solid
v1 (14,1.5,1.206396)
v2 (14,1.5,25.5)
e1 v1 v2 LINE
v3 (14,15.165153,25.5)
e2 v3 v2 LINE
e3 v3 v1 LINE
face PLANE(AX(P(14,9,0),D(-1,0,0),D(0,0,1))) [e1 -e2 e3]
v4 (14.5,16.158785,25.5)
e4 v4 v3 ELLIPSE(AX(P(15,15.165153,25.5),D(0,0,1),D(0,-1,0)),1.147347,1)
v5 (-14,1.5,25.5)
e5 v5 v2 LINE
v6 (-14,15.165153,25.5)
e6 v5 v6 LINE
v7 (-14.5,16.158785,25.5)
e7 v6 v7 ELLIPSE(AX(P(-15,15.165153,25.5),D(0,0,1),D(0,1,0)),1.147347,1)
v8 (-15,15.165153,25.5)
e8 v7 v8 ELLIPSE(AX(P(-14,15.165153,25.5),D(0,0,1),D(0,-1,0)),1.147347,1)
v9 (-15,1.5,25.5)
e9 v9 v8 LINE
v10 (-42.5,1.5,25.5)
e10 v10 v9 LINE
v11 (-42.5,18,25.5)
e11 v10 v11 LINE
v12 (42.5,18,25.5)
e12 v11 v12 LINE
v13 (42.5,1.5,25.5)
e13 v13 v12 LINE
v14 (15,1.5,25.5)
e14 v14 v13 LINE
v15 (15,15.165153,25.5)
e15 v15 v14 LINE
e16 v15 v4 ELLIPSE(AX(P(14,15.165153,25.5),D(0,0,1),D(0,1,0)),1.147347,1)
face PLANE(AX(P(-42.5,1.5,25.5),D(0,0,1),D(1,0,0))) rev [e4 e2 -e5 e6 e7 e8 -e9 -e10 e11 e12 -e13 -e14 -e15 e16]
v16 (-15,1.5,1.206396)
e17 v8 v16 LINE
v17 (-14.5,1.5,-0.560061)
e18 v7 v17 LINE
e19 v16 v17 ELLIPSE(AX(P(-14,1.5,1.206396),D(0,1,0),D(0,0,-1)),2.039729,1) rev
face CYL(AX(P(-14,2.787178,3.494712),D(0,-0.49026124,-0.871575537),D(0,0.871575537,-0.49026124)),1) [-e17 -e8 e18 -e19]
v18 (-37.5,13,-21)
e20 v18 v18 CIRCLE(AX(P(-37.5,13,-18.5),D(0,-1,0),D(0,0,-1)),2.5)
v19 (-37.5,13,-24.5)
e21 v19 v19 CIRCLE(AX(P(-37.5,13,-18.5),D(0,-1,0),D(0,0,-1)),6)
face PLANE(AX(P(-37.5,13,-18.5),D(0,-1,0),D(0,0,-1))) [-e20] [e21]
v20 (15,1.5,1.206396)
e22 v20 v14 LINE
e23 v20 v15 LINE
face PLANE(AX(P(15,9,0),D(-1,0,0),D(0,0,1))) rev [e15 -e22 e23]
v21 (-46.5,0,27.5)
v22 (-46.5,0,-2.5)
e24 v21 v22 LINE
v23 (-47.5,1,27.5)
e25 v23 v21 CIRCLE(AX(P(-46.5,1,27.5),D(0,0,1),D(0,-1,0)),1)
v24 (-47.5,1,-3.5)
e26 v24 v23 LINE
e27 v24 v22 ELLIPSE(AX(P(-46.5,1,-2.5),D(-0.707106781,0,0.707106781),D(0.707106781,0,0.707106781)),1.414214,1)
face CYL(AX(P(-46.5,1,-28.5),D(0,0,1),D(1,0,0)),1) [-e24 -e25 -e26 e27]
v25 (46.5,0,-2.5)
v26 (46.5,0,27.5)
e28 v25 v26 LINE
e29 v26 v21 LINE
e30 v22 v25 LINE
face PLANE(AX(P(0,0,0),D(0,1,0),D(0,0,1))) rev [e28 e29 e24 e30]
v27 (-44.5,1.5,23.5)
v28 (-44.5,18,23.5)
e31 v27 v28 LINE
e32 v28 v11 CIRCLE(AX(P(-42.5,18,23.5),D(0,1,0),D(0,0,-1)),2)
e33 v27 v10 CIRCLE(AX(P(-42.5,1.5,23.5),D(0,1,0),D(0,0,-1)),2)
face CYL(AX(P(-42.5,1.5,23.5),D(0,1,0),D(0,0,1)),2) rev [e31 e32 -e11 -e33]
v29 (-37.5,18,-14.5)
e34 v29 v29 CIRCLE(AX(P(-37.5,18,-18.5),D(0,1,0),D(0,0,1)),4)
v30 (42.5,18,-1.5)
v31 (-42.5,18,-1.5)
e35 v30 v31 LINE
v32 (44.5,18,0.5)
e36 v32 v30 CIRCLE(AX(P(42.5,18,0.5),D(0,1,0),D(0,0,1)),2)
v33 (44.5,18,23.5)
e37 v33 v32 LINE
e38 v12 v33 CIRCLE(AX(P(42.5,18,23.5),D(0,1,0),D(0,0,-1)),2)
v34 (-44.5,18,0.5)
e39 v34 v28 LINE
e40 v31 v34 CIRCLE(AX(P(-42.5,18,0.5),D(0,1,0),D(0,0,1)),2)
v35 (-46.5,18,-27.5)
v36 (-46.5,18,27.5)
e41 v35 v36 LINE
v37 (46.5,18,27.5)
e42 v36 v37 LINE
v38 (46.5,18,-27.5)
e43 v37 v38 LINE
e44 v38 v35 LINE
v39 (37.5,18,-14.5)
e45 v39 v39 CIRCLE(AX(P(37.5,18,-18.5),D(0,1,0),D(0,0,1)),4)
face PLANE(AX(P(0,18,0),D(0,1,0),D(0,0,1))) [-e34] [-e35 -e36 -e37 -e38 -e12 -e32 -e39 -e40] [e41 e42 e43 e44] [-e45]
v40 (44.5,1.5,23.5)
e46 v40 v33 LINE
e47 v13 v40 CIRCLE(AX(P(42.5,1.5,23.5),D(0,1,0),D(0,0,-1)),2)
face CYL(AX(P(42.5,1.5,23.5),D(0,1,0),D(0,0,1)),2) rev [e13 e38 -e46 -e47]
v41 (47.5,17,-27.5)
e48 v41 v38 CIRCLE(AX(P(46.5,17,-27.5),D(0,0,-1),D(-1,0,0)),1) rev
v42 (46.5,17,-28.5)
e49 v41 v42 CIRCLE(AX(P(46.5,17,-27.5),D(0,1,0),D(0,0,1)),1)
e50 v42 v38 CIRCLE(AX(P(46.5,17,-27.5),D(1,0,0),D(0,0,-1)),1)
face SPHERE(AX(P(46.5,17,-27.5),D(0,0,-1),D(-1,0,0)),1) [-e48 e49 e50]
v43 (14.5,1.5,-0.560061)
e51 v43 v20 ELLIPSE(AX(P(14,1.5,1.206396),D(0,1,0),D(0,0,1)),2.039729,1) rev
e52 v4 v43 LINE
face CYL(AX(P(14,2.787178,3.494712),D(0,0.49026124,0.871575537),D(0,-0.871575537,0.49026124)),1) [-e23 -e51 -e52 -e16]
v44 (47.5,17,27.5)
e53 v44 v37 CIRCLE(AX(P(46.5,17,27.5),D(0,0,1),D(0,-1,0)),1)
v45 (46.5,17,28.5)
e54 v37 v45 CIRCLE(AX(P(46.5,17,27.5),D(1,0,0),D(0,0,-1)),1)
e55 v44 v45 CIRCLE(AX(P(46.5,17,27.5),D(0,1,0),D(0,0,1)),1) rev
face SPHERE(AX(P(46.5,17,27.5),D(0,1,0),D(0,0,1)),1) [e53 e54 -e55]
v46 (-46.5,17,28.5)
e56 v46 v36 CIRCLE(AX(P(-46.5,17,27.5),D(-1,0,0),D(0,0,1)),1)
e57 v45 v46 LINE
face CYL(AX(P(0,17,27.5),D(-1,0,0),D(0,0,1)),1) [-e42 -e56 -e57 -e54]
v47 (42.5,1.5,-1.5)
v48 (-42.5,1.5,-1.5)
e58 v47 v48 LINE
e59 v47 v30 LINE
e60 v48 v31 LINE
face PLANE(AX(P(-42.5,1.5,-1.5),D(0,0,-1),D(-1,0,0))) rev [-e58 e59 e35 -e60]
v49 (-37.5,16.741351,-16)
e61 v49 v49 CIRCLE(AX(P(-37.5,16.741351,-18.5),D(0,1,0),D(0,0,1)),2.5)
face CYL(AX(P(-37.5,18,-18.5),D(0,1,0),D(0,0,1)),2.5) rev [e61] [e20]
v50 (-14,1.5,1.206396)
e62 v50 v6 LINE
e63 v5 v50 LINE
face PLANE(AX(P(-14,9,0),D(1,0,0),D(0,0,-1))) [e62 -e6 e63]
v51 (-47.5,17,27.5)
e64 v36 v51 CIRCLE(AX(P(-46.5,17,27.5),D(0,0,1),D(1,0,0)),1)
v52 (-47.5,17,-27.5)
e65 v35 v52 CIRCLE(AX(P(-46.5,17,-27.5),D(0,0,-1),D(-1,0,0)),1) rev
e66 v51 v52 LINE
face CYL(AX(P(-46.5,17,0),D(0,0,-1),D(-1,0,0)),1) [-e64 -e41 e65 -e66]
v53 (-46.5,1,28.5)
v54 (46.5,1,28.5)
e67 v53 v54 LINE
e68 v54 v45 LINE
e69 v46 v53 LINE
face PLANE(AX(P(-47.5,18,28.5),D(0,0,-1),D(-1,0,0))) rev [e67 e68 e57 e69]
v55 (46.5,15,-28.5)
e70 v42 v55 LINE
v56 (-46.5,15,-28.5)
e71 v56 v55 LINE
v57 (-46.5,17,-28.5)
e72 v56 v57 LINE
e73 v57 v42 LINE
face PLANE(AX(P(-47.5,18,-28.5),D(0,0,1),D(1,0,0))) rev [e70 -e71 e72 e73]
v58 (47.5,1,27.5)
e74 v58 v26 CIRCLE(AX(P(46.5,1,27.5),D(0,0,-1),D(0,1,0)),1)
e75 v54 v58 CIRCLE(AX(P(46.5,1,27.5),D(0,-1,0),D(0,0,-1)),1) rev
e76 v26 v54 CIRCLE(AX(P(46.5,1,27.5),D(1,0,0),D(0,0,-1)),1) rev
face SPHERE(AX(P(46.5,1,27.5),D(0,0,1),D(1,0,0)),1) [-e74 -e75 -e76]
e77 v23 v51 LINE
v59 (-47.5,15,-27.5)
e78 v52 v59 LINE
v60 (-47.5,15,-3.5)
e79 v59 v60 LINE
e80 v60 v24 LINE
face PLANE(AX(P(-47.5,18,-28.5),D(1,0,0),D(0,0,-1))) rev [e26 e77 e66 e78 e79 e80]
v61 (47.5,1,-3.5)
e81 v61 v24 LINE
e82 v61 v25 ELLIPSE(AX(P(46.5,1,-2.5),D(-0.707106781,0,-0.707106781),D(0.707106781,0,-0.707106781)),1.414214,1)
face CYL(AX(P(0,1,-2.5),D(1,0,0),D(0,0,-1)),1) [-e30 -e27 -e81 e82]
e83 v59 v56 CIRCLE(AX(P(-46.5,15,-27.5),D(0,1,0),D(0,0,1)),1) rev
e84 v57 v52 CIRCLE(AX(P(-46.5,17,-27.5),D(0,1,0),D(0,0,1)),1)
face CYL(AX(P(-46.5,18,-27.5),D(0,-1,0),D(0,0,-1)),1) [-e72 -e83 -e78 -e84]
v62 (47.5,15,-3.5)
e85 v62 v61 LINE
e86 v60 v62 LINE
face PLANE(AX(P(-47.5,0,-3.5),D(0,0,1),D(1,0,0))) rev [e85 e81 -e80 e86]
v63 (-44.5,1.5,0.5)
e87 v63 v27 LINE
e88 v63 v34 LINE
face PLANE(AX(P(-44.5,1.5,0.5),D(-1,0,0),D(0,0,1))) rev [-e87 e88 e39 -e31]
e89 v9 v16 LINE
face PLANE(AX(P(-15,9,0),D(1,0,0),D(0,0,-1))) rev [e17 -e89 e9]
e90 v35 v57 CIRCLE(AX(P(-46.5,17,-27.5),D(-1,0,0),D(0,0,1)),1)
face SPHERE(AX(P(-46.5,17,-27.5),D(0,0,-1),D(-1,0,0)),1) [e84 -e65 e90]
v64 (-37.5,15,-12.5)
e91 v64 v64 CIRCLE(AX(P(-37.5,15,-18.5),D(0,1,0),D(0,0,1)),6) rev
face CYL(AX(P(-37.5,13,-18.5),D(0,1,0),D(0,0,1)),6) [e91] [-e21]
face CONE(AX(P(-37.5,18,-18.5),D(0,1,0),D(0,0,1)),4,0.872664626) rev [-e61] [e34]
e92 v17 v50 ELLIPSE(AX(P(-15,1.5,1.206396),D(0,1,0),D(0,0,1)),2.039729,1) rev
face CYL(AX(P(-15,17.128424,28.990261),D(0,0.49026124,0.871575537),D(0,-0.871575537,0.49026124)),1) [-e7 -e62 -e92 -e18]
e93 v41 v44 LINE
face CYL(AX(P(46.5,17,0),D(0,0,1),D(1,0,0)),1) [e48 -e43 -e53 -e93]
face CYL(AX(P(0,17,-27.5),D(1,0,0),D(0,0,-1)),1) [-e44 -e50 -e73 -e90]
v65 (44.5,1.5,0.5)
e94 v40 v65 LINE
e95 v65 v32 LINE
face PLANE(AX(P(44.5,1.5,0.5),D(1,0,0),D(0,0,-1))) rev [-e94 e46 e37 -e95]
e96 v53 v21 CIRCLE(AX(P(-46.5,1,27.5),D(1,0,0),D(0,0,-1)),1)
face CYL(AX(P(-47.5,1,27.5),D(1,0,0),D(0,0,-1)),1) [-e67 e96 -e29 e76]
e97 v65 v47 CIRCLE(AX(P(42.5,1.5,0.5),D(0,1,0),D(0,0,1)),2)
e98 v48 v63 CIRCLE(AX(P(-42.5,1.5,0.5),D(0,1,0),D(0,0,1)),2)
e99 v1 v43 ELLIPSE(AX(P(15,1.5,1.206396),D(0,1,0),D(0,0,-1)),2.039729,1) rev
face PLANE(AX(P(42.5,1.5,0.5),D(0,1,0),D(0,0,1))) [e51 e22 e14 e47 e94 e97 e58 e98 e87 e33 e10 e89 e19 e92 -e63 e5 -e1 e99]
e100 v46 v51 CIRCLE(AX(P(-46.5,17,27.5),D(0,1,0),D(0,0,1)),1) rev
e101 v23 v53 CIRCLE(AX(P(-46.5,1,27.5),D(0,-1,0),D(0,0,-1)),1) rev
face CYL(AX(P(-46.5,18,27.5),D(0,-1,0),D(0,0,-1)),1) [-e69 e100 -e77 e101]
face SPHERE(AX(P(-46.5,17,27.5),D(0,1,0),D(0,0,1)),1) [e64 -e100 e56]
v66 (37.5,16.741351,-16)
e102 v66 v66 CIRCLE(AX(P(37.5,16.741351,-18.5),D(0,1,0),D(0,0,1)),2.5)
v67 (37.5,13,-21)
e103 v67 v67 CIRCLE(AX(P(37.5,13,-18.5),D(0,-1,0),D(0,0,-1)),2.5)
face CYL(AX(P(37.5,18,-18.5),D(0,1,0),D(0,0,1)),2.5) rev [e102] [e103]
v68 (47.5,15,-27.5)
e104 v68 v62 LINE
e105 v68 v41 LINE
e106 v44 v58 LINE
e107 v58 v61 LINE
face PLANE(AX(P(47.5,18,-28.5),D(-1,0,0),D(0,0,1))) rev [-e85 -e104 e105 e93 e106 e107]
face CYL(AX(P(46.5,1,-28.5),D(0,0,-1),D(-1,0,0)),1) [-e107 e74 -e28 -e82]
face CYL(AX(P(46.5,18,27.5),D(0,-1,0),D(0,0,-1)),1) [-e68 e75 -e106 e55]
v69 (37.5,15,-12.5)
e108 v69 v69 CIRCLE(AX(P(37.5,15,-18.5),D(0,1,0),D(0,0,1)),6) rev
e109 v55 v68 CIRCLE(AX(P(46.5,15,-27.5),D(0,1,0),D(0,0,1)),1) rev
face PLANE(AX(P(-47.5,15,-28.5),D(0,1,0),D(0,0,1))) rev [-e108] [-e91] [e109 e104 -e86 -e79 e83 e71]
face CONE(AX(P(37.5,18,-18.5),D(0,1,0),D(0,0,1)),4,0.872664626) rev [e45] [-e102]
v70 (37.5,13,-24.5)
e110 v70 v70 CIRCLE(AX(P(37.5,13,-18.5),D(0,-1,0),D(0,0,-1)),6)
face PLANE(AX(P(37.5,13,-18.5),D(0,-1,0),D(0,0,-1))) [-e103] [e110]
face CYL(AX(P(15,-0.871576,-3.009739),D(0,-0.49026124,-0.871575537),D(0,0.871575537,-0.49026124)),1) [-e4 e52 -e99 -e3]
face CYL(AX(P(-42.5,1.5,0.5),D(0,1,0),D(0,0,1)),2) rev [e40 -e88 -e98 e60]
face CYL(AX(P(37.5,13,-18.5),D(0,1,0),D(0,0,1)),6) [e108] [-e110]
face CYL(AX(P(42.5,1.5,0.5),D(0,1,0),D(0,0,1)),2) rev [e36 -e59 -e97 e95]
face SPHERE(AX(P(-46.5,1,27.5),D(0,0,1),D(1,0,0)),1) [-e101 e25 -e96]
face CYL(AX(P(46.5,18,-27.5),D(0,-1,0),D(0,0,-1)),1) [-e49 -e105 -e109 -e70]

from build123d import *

# Parameters (mm, degrees)
SKETCH2_W                                         = 95
SKETCH2_H                                         = 57
BOSS_EXTRUDE1_DEPTH                               = 18
SKETCH3_W                                         = 25
SKETCH3_H                                         = 15
CUT_EXTRUDE1_DEPTH                                = 101.803025748
CUT_EXTRUDE2_DEPTH                                = 16.5
SKETCH14_R                                        = 6
BOSS_EXTRUDE3_DEPTH                               = 2
CSK_FOR_4_FLAT_HEAD_MACHINE_SCREW_100_D           = 5
CSK_FOR_4_FLAT_HEAD_MACHINE_SCREW_100_CSINK_D     = 8
CSK_FOR_4_FLAT_HEAD_MACHINE_SCREW_100_CSINK_ANGLE = 100
RIB3_START                                        = -0.5
RIB3_DEPTH                                        = 1
RIB11_START                                       = -0.5
RIB11_DEPTH                                       = 1
FILLET1_R                                         = 1
FILLET2_R                                         = 1
FILLET3_R                                         = 1


# Read off the part's stored shape, not the designer's step: Rib3, Rib11
with BuildPart() as part:
    # Sketch2 → Boss-Extrude1 (new body)
    with BuildSketch(Plane(origin=(0, 0, 0), x_dir=(1, 0, 0), z_dir=(0, 1, 0))):
        Rectangle(SKETCH2_W, SKETCH2_H)
    extrude(amount=BOSS_EXTRUDE1_DEPTH)

    # Sketch3 → Cut-Extrude1 (cut, through all)
    with BuildSketch(Plane(origin=(47.5, 0, 0), x_dir=(0, 0, -1), z_dir=(1, 0, 0))):
        with Locations((16, 7.5)):
            Rectangle(SKETCH3_W, SKETCH3_H)
    extrude(amount=-CUT_EXTRUDE1_DEPTH, mode=Mode.SUBTRACT)

    # Sketch4 → Cut-Extrude2 (cut)
    with BuildSketch(Plane(origin=(0, 18, 0), x_dir=(1, 0, 0), z_dir=(0, 1, 0))):
        with BuildLine():
            Line((-42.5, 1.5), (42.5, 1.5))
            ThreePointArc((42.5, 1.5), (43.914213562, 0.914213562), (44.5, -0.5))
            Line((44.5, -0.5), (44.5, -23.5))
            ThreePointArc((44.5, -23.5), (43.914213562, -24.914213562), (42.5, -25.5))
            Line((42.5, -25.5), (-42.5, -25.5))
            ThreePointArc((-42.5, -25.5), (-43.914213562, -24.914213562), (-44.5, -23.5))
            Line((-44.5, -23.5), (-44.5, -0.5))
            ThreePointArc((-44.5, -0.5), (-43.914213562, 0.914213562), (-42.5, 1.5))
        make_face()
    extrude(amount=-CUT_EXTRUDE2_DEPTH, mode=Mode.SUBTRACT)

    # Sketch14 → Boss-Extrude3 (add)
    with BuildSketch(Plane(origin=(0, 15, 0), x_dir=(-1, 0, 0), z_dir=(0, -1, 0))):
        with Locations(Location((37.5, 18.5, 0), (0, 0, 270))):
            Circle(SKETCH14_R)
        with Locations(Location((-37.5, 18.5, 0), (0, 0, 270))):
            Circle(SKETCH14_R)
    extrude(amount=BOSS_EXTRUDE3_DEPTH)

    # CSK for #4 Flat Head Machine Screw (100)3 (through all)
    with Locations(Plane(origin=(37.5, 18, -18.5), x_dir=(0, 0, 1), z_dir=(0, 1, 0))):
        with Locations((0, 0), (0, -75)):
            CounterSinkHole(CSK_FOR_4_FLAT_HEAD_MACHINE_SCREW_100_D / 2, CSK_FOR_4_FLAT_HEAD_MACHINE_SCREW_100_CSINK_D / 2, counter_sink_angle=CSK_FOR_4_FLAT_HEAD_MACHINE_SCREW_100_CSINK_ANGLE)

    # Rib3 outline → Rib3 (add)
    with BuildSketch(Plane.ZY.offset(-14.5).offset(RIB3_START)):
        Polygon((25.5, 16.3125), (-0.833333333, 1.5), (25.5, 1.5), align=None)
    extrude(amount=RIB3_DEPTH)

    # Rib11 outline → Rib11 (add)
    with BuildSketch(Plane(origin=(-14.5, 0, 0), x_dir=(0, 0, -1), z_dir=(1, 0, 0)).offset(RIB11_START)):
        Polygon((0.833333333, 1.5), (-25.5, 16.3125), (-25.5, 1.5), align=None)
    extrude(amount=RIB11_DEPTH)

    # Fillet1
    # the kernel refuses this fillet: 1 mm, written as the material it takes off along each edge
    with BuildSketch(Plane(origin=(-15, 0.274346901, -3.012272176), x_dir=(0, -0.8715755371218976, 0.49026123963727325), z_dir=(0, 0.49026123963727325, 0.8715755371218976))) as fillet1_piece_1_section:
        with BuildLine():
            CenterArc((FILLET1_R, FILLET1_R), FILLET1_R, 180, 90)
            Line((0, FILLET1_R), (0, 0))
            Line((0, 0), (FILLET1_R, 0))
        make_face()
    fillet1_piece_1 = extrude(amount=35.213483756, mode=Mode.PRIVATE)
    fillet1_piece_1 = split(fillet1_piece_1, bisect_by=Plane(origin=(-14.771440182, 8.778475149, 25.5), z_dir=(0, 0, -1)), keep=Keep.TOP, mode=Mode.PRIVATE)
    fillet1_piece_1 = split(fillet1_piece_1, bisect_by=Plane(origin=(-14.771440182, 1.5, 12.560488623), z_dir=(0, 1, 0)), keep=Keep.TOP, mode=Mode.PRIVATE)
    add(fillet1_piece_1, mode=Mode.SUBTRACT)
    with BuildSketch(Plane(origin=(-14, 0.274346901, -3.012272176), x_dir=(-1, 0, 0), z_dir=(0, 0.49026123963727325, 0.8715755371218976))) as fillet1_piece_2_section:
        with BuildLine():
            CenterArc((FILLET1_R, FILLET1_R), FILLET1_R, 180, 90)
            Line((0, FILLET1_R), (0, 0))
            Line((0, 0), (FILLET1_R, 0))
        make_face()
    fillet1_piece_2 = extrude(amount=35.213483756, mode=Mode.PRIVATE)
    fillet1_piece_2 = split(fillet1_piece_2, bisect_by=Plane(origin=(-14.228559818, 8.778475149, 25.5), z_dir=(0, 0, -1)), keep=Keep.TOP, mode=Mode.PRIVATE)
    fillet1_piece_2 = split(fillet1_piece_2, bisect_by=Plane(origin=(-14.228559818, 1.5, 12.560488623), z_dir=(0, 1, 0)), keep=Keep.TOP, mode=Mode.PRIVATE)
    add(fillet1_piece_2, mode=Mode.SUBTRACT)
    with BuildSketch(Plane(origin=(14, 17.538153099, 27.678938843), x_dir=(0, -0.8715755371218977, 0.4902612396372733), z_dir=(0, -0.49026123963727325, -0.8715755371218976))) as fillet1_piece_3_section:
        with BuildLine():
            CenterArc((FILLET1_R, -FILLET1_R), FILLET1_R, 90, 90)
            Line((0, -FILLET1_R), (0, 0))
            Line((0, 0), (FILLET1_R, 0))
        make_face()
    fillet1_piece_3 = extrude(amount=35.213483756, mode=Mode.PRIVATE)
    fillet1_piece_3 = split(fillet1_piece_3, bisect_by=Plane(origin=(14.228559818, 8.778475149, 25.5), z_dir=(0, 0, -1)), keep=Keep.TOP, mode=Mode.PRIVATE)
    fillet1_piece_3 = split(fillet1_piece_3, bisect_by=Plane(origin=(14.228559818, 1.5, 12.560488623), z_dir=(0, 1, 0)), keep=Keep.TOP, mode=Mode.PRIVATE)
    add(fillet1_piece_3, mode=Mode.SUBTRACT)
    with BuildSketch(Plane(origin=(15, 17.538153099, 27.678938843), x_dir=(-1, 0, 0), z_dir=(0, -0.49026123963727325, -0.8715755371218976))) as fillet1_piece_4_section:
        with BuildLine():
            CenterArc((FILLET1_R, -FILLET1_R), FILLET1_R, 90, 90)
            Line((0, -FILLET1_R), (0, 0))
            Line((0, 0), (FILLET1_R, 0))
        make_face()
    fillet1_piece_4 = extrude(amount=35.213483756, mode=Mode.PRIVATE)
    fillet1_piece_4 = split(fillet1_piece_4, bisect_by=Plane(origin=(14.771440182, 8.778475149, 25.5), z_dir=(0, 0, -1)), keep=Keep.TOP, mode=Mode.PRIVATE)
    fillet1_piece_4 = split(fillet1_piece_4, bisect_by=Plane(origin=(14.771440182, 1.5, 12.560488623), z_dir=(0, 1, 0)), keep=Keep.TOP, mode=Mode.PRIVATE)
    add(fillet1_piece_4, mode=Mode.SUBTRACT)

    # Fillet2
    fillet2_edges = [part.edges().sort_by_distance(p)[0] for p in [
        (-47.5, 18, 0),
        (0, 18, 28.5),
        (47.5, 18, 0),
        (0, 0, 28.5),
        (47.5, 9, 28.5),
        (-47.5, 9, 28.5),
        (-47.5, 16.5, -28.5),
        (47.5, 16.5, -28.5),
        (0, 18, -28.5),
    ]]
    fillet(fillet2_edges, radius=FILLET2_R)

    # Fillet3
    # the kernel refuses this fillet: 1 mm, written as the material it takes off along each edge
    with BuildSketch(Plane(origin=(-46.5, 1, 27.5), x_dir=(0, -1, 0), z_dir=(-1, 0, 0))) as fillet3_piece_1_section:
        Polygon((0, 0), (FILLET3_R, 0), (FILLET3_R, FILLET3_R), (0, FILLET3_R), align=None)
    fillet3_piece_1 = extrude(amount=FILLET3_R, mode=Mode.PRIVATE)
    fillet3_piece_1 = fillet3_piece_1 - Plane(origin=(-46.5, 1, 27.5), x_dir=(0, 0.7071067811865475, -0.7071067811865475), z_dir=(-1, 0, 0)) * Sphere(FILLET3_R, mode=Mode.PRIVATE)
    add(fillet3_piece_1, mode=Mode.SUBTRACT)
    with BuildSketch(Plane(origin=(46.5, 1, 27.5), x_dir=(0, -1, 0), z_dir=(1, 0, 0))) as fillet3_piece_2_section:
        Polygon((0, 0), (FILLET3_R, 0), (FILLET3_R, -FILLET3_R), (0, -FILLET3_R), align=None)
    fillet3_piece_2 = extrude(amount=FILLET3_R, mode=Mode.PRIVATE)
    fillet3_piece_2 = fillet3_piece_2 - Plane(origin=(46.5, 1, 27.5), x_dir=(0, 0.7071067811865475, -0.7071067811865475), z_dir=(1, 0, 0)) * Sphere(FILLET3_R, mode=Mode.PRIVATE)
    add(fillet3_piece_2, mode=Mode.SUBTRACT)
    with BuildSketch(Plane(origin=(47.5, 0, -6), x_dir=(0, 1, 0), z_dir=(0, 0, 1)), Plane(origin=(-47.5, 0, 27.5), x_dir=(0, 1, 0), z_dir=(0, 0, -1))) as fillet3_piece_3:
        with BuildLine():
            CenterArc((FILLET3_R, FILLET3_R), FILLET3_R, 180, 90)
            Line((0, FILLET3_R), (0, 0))
            Line((0, 0), (FILLET3_R, 0))
        make_face()
    extrude(amount=33.5, mode=Mode.SUBTRACT)
    with BuildSketch(Plane(origin=(50, 0, -3.5), x_dir=(0, 1, 0), z_dir=(-1, 0, 0))) as fillet3_piece_4:
        with BuildLine():
            CenterArc((FILLET3_R, -FILLET3_R), FILLET3_R, 90, 90)
            Line((0, -FILLET3_R), (0, 0))
            Line((0, 0), (FILLET3_R, 0))
        make_face()
    extrude(amount=100, mode=Mode.SUBTRACT)


solid = part.part
